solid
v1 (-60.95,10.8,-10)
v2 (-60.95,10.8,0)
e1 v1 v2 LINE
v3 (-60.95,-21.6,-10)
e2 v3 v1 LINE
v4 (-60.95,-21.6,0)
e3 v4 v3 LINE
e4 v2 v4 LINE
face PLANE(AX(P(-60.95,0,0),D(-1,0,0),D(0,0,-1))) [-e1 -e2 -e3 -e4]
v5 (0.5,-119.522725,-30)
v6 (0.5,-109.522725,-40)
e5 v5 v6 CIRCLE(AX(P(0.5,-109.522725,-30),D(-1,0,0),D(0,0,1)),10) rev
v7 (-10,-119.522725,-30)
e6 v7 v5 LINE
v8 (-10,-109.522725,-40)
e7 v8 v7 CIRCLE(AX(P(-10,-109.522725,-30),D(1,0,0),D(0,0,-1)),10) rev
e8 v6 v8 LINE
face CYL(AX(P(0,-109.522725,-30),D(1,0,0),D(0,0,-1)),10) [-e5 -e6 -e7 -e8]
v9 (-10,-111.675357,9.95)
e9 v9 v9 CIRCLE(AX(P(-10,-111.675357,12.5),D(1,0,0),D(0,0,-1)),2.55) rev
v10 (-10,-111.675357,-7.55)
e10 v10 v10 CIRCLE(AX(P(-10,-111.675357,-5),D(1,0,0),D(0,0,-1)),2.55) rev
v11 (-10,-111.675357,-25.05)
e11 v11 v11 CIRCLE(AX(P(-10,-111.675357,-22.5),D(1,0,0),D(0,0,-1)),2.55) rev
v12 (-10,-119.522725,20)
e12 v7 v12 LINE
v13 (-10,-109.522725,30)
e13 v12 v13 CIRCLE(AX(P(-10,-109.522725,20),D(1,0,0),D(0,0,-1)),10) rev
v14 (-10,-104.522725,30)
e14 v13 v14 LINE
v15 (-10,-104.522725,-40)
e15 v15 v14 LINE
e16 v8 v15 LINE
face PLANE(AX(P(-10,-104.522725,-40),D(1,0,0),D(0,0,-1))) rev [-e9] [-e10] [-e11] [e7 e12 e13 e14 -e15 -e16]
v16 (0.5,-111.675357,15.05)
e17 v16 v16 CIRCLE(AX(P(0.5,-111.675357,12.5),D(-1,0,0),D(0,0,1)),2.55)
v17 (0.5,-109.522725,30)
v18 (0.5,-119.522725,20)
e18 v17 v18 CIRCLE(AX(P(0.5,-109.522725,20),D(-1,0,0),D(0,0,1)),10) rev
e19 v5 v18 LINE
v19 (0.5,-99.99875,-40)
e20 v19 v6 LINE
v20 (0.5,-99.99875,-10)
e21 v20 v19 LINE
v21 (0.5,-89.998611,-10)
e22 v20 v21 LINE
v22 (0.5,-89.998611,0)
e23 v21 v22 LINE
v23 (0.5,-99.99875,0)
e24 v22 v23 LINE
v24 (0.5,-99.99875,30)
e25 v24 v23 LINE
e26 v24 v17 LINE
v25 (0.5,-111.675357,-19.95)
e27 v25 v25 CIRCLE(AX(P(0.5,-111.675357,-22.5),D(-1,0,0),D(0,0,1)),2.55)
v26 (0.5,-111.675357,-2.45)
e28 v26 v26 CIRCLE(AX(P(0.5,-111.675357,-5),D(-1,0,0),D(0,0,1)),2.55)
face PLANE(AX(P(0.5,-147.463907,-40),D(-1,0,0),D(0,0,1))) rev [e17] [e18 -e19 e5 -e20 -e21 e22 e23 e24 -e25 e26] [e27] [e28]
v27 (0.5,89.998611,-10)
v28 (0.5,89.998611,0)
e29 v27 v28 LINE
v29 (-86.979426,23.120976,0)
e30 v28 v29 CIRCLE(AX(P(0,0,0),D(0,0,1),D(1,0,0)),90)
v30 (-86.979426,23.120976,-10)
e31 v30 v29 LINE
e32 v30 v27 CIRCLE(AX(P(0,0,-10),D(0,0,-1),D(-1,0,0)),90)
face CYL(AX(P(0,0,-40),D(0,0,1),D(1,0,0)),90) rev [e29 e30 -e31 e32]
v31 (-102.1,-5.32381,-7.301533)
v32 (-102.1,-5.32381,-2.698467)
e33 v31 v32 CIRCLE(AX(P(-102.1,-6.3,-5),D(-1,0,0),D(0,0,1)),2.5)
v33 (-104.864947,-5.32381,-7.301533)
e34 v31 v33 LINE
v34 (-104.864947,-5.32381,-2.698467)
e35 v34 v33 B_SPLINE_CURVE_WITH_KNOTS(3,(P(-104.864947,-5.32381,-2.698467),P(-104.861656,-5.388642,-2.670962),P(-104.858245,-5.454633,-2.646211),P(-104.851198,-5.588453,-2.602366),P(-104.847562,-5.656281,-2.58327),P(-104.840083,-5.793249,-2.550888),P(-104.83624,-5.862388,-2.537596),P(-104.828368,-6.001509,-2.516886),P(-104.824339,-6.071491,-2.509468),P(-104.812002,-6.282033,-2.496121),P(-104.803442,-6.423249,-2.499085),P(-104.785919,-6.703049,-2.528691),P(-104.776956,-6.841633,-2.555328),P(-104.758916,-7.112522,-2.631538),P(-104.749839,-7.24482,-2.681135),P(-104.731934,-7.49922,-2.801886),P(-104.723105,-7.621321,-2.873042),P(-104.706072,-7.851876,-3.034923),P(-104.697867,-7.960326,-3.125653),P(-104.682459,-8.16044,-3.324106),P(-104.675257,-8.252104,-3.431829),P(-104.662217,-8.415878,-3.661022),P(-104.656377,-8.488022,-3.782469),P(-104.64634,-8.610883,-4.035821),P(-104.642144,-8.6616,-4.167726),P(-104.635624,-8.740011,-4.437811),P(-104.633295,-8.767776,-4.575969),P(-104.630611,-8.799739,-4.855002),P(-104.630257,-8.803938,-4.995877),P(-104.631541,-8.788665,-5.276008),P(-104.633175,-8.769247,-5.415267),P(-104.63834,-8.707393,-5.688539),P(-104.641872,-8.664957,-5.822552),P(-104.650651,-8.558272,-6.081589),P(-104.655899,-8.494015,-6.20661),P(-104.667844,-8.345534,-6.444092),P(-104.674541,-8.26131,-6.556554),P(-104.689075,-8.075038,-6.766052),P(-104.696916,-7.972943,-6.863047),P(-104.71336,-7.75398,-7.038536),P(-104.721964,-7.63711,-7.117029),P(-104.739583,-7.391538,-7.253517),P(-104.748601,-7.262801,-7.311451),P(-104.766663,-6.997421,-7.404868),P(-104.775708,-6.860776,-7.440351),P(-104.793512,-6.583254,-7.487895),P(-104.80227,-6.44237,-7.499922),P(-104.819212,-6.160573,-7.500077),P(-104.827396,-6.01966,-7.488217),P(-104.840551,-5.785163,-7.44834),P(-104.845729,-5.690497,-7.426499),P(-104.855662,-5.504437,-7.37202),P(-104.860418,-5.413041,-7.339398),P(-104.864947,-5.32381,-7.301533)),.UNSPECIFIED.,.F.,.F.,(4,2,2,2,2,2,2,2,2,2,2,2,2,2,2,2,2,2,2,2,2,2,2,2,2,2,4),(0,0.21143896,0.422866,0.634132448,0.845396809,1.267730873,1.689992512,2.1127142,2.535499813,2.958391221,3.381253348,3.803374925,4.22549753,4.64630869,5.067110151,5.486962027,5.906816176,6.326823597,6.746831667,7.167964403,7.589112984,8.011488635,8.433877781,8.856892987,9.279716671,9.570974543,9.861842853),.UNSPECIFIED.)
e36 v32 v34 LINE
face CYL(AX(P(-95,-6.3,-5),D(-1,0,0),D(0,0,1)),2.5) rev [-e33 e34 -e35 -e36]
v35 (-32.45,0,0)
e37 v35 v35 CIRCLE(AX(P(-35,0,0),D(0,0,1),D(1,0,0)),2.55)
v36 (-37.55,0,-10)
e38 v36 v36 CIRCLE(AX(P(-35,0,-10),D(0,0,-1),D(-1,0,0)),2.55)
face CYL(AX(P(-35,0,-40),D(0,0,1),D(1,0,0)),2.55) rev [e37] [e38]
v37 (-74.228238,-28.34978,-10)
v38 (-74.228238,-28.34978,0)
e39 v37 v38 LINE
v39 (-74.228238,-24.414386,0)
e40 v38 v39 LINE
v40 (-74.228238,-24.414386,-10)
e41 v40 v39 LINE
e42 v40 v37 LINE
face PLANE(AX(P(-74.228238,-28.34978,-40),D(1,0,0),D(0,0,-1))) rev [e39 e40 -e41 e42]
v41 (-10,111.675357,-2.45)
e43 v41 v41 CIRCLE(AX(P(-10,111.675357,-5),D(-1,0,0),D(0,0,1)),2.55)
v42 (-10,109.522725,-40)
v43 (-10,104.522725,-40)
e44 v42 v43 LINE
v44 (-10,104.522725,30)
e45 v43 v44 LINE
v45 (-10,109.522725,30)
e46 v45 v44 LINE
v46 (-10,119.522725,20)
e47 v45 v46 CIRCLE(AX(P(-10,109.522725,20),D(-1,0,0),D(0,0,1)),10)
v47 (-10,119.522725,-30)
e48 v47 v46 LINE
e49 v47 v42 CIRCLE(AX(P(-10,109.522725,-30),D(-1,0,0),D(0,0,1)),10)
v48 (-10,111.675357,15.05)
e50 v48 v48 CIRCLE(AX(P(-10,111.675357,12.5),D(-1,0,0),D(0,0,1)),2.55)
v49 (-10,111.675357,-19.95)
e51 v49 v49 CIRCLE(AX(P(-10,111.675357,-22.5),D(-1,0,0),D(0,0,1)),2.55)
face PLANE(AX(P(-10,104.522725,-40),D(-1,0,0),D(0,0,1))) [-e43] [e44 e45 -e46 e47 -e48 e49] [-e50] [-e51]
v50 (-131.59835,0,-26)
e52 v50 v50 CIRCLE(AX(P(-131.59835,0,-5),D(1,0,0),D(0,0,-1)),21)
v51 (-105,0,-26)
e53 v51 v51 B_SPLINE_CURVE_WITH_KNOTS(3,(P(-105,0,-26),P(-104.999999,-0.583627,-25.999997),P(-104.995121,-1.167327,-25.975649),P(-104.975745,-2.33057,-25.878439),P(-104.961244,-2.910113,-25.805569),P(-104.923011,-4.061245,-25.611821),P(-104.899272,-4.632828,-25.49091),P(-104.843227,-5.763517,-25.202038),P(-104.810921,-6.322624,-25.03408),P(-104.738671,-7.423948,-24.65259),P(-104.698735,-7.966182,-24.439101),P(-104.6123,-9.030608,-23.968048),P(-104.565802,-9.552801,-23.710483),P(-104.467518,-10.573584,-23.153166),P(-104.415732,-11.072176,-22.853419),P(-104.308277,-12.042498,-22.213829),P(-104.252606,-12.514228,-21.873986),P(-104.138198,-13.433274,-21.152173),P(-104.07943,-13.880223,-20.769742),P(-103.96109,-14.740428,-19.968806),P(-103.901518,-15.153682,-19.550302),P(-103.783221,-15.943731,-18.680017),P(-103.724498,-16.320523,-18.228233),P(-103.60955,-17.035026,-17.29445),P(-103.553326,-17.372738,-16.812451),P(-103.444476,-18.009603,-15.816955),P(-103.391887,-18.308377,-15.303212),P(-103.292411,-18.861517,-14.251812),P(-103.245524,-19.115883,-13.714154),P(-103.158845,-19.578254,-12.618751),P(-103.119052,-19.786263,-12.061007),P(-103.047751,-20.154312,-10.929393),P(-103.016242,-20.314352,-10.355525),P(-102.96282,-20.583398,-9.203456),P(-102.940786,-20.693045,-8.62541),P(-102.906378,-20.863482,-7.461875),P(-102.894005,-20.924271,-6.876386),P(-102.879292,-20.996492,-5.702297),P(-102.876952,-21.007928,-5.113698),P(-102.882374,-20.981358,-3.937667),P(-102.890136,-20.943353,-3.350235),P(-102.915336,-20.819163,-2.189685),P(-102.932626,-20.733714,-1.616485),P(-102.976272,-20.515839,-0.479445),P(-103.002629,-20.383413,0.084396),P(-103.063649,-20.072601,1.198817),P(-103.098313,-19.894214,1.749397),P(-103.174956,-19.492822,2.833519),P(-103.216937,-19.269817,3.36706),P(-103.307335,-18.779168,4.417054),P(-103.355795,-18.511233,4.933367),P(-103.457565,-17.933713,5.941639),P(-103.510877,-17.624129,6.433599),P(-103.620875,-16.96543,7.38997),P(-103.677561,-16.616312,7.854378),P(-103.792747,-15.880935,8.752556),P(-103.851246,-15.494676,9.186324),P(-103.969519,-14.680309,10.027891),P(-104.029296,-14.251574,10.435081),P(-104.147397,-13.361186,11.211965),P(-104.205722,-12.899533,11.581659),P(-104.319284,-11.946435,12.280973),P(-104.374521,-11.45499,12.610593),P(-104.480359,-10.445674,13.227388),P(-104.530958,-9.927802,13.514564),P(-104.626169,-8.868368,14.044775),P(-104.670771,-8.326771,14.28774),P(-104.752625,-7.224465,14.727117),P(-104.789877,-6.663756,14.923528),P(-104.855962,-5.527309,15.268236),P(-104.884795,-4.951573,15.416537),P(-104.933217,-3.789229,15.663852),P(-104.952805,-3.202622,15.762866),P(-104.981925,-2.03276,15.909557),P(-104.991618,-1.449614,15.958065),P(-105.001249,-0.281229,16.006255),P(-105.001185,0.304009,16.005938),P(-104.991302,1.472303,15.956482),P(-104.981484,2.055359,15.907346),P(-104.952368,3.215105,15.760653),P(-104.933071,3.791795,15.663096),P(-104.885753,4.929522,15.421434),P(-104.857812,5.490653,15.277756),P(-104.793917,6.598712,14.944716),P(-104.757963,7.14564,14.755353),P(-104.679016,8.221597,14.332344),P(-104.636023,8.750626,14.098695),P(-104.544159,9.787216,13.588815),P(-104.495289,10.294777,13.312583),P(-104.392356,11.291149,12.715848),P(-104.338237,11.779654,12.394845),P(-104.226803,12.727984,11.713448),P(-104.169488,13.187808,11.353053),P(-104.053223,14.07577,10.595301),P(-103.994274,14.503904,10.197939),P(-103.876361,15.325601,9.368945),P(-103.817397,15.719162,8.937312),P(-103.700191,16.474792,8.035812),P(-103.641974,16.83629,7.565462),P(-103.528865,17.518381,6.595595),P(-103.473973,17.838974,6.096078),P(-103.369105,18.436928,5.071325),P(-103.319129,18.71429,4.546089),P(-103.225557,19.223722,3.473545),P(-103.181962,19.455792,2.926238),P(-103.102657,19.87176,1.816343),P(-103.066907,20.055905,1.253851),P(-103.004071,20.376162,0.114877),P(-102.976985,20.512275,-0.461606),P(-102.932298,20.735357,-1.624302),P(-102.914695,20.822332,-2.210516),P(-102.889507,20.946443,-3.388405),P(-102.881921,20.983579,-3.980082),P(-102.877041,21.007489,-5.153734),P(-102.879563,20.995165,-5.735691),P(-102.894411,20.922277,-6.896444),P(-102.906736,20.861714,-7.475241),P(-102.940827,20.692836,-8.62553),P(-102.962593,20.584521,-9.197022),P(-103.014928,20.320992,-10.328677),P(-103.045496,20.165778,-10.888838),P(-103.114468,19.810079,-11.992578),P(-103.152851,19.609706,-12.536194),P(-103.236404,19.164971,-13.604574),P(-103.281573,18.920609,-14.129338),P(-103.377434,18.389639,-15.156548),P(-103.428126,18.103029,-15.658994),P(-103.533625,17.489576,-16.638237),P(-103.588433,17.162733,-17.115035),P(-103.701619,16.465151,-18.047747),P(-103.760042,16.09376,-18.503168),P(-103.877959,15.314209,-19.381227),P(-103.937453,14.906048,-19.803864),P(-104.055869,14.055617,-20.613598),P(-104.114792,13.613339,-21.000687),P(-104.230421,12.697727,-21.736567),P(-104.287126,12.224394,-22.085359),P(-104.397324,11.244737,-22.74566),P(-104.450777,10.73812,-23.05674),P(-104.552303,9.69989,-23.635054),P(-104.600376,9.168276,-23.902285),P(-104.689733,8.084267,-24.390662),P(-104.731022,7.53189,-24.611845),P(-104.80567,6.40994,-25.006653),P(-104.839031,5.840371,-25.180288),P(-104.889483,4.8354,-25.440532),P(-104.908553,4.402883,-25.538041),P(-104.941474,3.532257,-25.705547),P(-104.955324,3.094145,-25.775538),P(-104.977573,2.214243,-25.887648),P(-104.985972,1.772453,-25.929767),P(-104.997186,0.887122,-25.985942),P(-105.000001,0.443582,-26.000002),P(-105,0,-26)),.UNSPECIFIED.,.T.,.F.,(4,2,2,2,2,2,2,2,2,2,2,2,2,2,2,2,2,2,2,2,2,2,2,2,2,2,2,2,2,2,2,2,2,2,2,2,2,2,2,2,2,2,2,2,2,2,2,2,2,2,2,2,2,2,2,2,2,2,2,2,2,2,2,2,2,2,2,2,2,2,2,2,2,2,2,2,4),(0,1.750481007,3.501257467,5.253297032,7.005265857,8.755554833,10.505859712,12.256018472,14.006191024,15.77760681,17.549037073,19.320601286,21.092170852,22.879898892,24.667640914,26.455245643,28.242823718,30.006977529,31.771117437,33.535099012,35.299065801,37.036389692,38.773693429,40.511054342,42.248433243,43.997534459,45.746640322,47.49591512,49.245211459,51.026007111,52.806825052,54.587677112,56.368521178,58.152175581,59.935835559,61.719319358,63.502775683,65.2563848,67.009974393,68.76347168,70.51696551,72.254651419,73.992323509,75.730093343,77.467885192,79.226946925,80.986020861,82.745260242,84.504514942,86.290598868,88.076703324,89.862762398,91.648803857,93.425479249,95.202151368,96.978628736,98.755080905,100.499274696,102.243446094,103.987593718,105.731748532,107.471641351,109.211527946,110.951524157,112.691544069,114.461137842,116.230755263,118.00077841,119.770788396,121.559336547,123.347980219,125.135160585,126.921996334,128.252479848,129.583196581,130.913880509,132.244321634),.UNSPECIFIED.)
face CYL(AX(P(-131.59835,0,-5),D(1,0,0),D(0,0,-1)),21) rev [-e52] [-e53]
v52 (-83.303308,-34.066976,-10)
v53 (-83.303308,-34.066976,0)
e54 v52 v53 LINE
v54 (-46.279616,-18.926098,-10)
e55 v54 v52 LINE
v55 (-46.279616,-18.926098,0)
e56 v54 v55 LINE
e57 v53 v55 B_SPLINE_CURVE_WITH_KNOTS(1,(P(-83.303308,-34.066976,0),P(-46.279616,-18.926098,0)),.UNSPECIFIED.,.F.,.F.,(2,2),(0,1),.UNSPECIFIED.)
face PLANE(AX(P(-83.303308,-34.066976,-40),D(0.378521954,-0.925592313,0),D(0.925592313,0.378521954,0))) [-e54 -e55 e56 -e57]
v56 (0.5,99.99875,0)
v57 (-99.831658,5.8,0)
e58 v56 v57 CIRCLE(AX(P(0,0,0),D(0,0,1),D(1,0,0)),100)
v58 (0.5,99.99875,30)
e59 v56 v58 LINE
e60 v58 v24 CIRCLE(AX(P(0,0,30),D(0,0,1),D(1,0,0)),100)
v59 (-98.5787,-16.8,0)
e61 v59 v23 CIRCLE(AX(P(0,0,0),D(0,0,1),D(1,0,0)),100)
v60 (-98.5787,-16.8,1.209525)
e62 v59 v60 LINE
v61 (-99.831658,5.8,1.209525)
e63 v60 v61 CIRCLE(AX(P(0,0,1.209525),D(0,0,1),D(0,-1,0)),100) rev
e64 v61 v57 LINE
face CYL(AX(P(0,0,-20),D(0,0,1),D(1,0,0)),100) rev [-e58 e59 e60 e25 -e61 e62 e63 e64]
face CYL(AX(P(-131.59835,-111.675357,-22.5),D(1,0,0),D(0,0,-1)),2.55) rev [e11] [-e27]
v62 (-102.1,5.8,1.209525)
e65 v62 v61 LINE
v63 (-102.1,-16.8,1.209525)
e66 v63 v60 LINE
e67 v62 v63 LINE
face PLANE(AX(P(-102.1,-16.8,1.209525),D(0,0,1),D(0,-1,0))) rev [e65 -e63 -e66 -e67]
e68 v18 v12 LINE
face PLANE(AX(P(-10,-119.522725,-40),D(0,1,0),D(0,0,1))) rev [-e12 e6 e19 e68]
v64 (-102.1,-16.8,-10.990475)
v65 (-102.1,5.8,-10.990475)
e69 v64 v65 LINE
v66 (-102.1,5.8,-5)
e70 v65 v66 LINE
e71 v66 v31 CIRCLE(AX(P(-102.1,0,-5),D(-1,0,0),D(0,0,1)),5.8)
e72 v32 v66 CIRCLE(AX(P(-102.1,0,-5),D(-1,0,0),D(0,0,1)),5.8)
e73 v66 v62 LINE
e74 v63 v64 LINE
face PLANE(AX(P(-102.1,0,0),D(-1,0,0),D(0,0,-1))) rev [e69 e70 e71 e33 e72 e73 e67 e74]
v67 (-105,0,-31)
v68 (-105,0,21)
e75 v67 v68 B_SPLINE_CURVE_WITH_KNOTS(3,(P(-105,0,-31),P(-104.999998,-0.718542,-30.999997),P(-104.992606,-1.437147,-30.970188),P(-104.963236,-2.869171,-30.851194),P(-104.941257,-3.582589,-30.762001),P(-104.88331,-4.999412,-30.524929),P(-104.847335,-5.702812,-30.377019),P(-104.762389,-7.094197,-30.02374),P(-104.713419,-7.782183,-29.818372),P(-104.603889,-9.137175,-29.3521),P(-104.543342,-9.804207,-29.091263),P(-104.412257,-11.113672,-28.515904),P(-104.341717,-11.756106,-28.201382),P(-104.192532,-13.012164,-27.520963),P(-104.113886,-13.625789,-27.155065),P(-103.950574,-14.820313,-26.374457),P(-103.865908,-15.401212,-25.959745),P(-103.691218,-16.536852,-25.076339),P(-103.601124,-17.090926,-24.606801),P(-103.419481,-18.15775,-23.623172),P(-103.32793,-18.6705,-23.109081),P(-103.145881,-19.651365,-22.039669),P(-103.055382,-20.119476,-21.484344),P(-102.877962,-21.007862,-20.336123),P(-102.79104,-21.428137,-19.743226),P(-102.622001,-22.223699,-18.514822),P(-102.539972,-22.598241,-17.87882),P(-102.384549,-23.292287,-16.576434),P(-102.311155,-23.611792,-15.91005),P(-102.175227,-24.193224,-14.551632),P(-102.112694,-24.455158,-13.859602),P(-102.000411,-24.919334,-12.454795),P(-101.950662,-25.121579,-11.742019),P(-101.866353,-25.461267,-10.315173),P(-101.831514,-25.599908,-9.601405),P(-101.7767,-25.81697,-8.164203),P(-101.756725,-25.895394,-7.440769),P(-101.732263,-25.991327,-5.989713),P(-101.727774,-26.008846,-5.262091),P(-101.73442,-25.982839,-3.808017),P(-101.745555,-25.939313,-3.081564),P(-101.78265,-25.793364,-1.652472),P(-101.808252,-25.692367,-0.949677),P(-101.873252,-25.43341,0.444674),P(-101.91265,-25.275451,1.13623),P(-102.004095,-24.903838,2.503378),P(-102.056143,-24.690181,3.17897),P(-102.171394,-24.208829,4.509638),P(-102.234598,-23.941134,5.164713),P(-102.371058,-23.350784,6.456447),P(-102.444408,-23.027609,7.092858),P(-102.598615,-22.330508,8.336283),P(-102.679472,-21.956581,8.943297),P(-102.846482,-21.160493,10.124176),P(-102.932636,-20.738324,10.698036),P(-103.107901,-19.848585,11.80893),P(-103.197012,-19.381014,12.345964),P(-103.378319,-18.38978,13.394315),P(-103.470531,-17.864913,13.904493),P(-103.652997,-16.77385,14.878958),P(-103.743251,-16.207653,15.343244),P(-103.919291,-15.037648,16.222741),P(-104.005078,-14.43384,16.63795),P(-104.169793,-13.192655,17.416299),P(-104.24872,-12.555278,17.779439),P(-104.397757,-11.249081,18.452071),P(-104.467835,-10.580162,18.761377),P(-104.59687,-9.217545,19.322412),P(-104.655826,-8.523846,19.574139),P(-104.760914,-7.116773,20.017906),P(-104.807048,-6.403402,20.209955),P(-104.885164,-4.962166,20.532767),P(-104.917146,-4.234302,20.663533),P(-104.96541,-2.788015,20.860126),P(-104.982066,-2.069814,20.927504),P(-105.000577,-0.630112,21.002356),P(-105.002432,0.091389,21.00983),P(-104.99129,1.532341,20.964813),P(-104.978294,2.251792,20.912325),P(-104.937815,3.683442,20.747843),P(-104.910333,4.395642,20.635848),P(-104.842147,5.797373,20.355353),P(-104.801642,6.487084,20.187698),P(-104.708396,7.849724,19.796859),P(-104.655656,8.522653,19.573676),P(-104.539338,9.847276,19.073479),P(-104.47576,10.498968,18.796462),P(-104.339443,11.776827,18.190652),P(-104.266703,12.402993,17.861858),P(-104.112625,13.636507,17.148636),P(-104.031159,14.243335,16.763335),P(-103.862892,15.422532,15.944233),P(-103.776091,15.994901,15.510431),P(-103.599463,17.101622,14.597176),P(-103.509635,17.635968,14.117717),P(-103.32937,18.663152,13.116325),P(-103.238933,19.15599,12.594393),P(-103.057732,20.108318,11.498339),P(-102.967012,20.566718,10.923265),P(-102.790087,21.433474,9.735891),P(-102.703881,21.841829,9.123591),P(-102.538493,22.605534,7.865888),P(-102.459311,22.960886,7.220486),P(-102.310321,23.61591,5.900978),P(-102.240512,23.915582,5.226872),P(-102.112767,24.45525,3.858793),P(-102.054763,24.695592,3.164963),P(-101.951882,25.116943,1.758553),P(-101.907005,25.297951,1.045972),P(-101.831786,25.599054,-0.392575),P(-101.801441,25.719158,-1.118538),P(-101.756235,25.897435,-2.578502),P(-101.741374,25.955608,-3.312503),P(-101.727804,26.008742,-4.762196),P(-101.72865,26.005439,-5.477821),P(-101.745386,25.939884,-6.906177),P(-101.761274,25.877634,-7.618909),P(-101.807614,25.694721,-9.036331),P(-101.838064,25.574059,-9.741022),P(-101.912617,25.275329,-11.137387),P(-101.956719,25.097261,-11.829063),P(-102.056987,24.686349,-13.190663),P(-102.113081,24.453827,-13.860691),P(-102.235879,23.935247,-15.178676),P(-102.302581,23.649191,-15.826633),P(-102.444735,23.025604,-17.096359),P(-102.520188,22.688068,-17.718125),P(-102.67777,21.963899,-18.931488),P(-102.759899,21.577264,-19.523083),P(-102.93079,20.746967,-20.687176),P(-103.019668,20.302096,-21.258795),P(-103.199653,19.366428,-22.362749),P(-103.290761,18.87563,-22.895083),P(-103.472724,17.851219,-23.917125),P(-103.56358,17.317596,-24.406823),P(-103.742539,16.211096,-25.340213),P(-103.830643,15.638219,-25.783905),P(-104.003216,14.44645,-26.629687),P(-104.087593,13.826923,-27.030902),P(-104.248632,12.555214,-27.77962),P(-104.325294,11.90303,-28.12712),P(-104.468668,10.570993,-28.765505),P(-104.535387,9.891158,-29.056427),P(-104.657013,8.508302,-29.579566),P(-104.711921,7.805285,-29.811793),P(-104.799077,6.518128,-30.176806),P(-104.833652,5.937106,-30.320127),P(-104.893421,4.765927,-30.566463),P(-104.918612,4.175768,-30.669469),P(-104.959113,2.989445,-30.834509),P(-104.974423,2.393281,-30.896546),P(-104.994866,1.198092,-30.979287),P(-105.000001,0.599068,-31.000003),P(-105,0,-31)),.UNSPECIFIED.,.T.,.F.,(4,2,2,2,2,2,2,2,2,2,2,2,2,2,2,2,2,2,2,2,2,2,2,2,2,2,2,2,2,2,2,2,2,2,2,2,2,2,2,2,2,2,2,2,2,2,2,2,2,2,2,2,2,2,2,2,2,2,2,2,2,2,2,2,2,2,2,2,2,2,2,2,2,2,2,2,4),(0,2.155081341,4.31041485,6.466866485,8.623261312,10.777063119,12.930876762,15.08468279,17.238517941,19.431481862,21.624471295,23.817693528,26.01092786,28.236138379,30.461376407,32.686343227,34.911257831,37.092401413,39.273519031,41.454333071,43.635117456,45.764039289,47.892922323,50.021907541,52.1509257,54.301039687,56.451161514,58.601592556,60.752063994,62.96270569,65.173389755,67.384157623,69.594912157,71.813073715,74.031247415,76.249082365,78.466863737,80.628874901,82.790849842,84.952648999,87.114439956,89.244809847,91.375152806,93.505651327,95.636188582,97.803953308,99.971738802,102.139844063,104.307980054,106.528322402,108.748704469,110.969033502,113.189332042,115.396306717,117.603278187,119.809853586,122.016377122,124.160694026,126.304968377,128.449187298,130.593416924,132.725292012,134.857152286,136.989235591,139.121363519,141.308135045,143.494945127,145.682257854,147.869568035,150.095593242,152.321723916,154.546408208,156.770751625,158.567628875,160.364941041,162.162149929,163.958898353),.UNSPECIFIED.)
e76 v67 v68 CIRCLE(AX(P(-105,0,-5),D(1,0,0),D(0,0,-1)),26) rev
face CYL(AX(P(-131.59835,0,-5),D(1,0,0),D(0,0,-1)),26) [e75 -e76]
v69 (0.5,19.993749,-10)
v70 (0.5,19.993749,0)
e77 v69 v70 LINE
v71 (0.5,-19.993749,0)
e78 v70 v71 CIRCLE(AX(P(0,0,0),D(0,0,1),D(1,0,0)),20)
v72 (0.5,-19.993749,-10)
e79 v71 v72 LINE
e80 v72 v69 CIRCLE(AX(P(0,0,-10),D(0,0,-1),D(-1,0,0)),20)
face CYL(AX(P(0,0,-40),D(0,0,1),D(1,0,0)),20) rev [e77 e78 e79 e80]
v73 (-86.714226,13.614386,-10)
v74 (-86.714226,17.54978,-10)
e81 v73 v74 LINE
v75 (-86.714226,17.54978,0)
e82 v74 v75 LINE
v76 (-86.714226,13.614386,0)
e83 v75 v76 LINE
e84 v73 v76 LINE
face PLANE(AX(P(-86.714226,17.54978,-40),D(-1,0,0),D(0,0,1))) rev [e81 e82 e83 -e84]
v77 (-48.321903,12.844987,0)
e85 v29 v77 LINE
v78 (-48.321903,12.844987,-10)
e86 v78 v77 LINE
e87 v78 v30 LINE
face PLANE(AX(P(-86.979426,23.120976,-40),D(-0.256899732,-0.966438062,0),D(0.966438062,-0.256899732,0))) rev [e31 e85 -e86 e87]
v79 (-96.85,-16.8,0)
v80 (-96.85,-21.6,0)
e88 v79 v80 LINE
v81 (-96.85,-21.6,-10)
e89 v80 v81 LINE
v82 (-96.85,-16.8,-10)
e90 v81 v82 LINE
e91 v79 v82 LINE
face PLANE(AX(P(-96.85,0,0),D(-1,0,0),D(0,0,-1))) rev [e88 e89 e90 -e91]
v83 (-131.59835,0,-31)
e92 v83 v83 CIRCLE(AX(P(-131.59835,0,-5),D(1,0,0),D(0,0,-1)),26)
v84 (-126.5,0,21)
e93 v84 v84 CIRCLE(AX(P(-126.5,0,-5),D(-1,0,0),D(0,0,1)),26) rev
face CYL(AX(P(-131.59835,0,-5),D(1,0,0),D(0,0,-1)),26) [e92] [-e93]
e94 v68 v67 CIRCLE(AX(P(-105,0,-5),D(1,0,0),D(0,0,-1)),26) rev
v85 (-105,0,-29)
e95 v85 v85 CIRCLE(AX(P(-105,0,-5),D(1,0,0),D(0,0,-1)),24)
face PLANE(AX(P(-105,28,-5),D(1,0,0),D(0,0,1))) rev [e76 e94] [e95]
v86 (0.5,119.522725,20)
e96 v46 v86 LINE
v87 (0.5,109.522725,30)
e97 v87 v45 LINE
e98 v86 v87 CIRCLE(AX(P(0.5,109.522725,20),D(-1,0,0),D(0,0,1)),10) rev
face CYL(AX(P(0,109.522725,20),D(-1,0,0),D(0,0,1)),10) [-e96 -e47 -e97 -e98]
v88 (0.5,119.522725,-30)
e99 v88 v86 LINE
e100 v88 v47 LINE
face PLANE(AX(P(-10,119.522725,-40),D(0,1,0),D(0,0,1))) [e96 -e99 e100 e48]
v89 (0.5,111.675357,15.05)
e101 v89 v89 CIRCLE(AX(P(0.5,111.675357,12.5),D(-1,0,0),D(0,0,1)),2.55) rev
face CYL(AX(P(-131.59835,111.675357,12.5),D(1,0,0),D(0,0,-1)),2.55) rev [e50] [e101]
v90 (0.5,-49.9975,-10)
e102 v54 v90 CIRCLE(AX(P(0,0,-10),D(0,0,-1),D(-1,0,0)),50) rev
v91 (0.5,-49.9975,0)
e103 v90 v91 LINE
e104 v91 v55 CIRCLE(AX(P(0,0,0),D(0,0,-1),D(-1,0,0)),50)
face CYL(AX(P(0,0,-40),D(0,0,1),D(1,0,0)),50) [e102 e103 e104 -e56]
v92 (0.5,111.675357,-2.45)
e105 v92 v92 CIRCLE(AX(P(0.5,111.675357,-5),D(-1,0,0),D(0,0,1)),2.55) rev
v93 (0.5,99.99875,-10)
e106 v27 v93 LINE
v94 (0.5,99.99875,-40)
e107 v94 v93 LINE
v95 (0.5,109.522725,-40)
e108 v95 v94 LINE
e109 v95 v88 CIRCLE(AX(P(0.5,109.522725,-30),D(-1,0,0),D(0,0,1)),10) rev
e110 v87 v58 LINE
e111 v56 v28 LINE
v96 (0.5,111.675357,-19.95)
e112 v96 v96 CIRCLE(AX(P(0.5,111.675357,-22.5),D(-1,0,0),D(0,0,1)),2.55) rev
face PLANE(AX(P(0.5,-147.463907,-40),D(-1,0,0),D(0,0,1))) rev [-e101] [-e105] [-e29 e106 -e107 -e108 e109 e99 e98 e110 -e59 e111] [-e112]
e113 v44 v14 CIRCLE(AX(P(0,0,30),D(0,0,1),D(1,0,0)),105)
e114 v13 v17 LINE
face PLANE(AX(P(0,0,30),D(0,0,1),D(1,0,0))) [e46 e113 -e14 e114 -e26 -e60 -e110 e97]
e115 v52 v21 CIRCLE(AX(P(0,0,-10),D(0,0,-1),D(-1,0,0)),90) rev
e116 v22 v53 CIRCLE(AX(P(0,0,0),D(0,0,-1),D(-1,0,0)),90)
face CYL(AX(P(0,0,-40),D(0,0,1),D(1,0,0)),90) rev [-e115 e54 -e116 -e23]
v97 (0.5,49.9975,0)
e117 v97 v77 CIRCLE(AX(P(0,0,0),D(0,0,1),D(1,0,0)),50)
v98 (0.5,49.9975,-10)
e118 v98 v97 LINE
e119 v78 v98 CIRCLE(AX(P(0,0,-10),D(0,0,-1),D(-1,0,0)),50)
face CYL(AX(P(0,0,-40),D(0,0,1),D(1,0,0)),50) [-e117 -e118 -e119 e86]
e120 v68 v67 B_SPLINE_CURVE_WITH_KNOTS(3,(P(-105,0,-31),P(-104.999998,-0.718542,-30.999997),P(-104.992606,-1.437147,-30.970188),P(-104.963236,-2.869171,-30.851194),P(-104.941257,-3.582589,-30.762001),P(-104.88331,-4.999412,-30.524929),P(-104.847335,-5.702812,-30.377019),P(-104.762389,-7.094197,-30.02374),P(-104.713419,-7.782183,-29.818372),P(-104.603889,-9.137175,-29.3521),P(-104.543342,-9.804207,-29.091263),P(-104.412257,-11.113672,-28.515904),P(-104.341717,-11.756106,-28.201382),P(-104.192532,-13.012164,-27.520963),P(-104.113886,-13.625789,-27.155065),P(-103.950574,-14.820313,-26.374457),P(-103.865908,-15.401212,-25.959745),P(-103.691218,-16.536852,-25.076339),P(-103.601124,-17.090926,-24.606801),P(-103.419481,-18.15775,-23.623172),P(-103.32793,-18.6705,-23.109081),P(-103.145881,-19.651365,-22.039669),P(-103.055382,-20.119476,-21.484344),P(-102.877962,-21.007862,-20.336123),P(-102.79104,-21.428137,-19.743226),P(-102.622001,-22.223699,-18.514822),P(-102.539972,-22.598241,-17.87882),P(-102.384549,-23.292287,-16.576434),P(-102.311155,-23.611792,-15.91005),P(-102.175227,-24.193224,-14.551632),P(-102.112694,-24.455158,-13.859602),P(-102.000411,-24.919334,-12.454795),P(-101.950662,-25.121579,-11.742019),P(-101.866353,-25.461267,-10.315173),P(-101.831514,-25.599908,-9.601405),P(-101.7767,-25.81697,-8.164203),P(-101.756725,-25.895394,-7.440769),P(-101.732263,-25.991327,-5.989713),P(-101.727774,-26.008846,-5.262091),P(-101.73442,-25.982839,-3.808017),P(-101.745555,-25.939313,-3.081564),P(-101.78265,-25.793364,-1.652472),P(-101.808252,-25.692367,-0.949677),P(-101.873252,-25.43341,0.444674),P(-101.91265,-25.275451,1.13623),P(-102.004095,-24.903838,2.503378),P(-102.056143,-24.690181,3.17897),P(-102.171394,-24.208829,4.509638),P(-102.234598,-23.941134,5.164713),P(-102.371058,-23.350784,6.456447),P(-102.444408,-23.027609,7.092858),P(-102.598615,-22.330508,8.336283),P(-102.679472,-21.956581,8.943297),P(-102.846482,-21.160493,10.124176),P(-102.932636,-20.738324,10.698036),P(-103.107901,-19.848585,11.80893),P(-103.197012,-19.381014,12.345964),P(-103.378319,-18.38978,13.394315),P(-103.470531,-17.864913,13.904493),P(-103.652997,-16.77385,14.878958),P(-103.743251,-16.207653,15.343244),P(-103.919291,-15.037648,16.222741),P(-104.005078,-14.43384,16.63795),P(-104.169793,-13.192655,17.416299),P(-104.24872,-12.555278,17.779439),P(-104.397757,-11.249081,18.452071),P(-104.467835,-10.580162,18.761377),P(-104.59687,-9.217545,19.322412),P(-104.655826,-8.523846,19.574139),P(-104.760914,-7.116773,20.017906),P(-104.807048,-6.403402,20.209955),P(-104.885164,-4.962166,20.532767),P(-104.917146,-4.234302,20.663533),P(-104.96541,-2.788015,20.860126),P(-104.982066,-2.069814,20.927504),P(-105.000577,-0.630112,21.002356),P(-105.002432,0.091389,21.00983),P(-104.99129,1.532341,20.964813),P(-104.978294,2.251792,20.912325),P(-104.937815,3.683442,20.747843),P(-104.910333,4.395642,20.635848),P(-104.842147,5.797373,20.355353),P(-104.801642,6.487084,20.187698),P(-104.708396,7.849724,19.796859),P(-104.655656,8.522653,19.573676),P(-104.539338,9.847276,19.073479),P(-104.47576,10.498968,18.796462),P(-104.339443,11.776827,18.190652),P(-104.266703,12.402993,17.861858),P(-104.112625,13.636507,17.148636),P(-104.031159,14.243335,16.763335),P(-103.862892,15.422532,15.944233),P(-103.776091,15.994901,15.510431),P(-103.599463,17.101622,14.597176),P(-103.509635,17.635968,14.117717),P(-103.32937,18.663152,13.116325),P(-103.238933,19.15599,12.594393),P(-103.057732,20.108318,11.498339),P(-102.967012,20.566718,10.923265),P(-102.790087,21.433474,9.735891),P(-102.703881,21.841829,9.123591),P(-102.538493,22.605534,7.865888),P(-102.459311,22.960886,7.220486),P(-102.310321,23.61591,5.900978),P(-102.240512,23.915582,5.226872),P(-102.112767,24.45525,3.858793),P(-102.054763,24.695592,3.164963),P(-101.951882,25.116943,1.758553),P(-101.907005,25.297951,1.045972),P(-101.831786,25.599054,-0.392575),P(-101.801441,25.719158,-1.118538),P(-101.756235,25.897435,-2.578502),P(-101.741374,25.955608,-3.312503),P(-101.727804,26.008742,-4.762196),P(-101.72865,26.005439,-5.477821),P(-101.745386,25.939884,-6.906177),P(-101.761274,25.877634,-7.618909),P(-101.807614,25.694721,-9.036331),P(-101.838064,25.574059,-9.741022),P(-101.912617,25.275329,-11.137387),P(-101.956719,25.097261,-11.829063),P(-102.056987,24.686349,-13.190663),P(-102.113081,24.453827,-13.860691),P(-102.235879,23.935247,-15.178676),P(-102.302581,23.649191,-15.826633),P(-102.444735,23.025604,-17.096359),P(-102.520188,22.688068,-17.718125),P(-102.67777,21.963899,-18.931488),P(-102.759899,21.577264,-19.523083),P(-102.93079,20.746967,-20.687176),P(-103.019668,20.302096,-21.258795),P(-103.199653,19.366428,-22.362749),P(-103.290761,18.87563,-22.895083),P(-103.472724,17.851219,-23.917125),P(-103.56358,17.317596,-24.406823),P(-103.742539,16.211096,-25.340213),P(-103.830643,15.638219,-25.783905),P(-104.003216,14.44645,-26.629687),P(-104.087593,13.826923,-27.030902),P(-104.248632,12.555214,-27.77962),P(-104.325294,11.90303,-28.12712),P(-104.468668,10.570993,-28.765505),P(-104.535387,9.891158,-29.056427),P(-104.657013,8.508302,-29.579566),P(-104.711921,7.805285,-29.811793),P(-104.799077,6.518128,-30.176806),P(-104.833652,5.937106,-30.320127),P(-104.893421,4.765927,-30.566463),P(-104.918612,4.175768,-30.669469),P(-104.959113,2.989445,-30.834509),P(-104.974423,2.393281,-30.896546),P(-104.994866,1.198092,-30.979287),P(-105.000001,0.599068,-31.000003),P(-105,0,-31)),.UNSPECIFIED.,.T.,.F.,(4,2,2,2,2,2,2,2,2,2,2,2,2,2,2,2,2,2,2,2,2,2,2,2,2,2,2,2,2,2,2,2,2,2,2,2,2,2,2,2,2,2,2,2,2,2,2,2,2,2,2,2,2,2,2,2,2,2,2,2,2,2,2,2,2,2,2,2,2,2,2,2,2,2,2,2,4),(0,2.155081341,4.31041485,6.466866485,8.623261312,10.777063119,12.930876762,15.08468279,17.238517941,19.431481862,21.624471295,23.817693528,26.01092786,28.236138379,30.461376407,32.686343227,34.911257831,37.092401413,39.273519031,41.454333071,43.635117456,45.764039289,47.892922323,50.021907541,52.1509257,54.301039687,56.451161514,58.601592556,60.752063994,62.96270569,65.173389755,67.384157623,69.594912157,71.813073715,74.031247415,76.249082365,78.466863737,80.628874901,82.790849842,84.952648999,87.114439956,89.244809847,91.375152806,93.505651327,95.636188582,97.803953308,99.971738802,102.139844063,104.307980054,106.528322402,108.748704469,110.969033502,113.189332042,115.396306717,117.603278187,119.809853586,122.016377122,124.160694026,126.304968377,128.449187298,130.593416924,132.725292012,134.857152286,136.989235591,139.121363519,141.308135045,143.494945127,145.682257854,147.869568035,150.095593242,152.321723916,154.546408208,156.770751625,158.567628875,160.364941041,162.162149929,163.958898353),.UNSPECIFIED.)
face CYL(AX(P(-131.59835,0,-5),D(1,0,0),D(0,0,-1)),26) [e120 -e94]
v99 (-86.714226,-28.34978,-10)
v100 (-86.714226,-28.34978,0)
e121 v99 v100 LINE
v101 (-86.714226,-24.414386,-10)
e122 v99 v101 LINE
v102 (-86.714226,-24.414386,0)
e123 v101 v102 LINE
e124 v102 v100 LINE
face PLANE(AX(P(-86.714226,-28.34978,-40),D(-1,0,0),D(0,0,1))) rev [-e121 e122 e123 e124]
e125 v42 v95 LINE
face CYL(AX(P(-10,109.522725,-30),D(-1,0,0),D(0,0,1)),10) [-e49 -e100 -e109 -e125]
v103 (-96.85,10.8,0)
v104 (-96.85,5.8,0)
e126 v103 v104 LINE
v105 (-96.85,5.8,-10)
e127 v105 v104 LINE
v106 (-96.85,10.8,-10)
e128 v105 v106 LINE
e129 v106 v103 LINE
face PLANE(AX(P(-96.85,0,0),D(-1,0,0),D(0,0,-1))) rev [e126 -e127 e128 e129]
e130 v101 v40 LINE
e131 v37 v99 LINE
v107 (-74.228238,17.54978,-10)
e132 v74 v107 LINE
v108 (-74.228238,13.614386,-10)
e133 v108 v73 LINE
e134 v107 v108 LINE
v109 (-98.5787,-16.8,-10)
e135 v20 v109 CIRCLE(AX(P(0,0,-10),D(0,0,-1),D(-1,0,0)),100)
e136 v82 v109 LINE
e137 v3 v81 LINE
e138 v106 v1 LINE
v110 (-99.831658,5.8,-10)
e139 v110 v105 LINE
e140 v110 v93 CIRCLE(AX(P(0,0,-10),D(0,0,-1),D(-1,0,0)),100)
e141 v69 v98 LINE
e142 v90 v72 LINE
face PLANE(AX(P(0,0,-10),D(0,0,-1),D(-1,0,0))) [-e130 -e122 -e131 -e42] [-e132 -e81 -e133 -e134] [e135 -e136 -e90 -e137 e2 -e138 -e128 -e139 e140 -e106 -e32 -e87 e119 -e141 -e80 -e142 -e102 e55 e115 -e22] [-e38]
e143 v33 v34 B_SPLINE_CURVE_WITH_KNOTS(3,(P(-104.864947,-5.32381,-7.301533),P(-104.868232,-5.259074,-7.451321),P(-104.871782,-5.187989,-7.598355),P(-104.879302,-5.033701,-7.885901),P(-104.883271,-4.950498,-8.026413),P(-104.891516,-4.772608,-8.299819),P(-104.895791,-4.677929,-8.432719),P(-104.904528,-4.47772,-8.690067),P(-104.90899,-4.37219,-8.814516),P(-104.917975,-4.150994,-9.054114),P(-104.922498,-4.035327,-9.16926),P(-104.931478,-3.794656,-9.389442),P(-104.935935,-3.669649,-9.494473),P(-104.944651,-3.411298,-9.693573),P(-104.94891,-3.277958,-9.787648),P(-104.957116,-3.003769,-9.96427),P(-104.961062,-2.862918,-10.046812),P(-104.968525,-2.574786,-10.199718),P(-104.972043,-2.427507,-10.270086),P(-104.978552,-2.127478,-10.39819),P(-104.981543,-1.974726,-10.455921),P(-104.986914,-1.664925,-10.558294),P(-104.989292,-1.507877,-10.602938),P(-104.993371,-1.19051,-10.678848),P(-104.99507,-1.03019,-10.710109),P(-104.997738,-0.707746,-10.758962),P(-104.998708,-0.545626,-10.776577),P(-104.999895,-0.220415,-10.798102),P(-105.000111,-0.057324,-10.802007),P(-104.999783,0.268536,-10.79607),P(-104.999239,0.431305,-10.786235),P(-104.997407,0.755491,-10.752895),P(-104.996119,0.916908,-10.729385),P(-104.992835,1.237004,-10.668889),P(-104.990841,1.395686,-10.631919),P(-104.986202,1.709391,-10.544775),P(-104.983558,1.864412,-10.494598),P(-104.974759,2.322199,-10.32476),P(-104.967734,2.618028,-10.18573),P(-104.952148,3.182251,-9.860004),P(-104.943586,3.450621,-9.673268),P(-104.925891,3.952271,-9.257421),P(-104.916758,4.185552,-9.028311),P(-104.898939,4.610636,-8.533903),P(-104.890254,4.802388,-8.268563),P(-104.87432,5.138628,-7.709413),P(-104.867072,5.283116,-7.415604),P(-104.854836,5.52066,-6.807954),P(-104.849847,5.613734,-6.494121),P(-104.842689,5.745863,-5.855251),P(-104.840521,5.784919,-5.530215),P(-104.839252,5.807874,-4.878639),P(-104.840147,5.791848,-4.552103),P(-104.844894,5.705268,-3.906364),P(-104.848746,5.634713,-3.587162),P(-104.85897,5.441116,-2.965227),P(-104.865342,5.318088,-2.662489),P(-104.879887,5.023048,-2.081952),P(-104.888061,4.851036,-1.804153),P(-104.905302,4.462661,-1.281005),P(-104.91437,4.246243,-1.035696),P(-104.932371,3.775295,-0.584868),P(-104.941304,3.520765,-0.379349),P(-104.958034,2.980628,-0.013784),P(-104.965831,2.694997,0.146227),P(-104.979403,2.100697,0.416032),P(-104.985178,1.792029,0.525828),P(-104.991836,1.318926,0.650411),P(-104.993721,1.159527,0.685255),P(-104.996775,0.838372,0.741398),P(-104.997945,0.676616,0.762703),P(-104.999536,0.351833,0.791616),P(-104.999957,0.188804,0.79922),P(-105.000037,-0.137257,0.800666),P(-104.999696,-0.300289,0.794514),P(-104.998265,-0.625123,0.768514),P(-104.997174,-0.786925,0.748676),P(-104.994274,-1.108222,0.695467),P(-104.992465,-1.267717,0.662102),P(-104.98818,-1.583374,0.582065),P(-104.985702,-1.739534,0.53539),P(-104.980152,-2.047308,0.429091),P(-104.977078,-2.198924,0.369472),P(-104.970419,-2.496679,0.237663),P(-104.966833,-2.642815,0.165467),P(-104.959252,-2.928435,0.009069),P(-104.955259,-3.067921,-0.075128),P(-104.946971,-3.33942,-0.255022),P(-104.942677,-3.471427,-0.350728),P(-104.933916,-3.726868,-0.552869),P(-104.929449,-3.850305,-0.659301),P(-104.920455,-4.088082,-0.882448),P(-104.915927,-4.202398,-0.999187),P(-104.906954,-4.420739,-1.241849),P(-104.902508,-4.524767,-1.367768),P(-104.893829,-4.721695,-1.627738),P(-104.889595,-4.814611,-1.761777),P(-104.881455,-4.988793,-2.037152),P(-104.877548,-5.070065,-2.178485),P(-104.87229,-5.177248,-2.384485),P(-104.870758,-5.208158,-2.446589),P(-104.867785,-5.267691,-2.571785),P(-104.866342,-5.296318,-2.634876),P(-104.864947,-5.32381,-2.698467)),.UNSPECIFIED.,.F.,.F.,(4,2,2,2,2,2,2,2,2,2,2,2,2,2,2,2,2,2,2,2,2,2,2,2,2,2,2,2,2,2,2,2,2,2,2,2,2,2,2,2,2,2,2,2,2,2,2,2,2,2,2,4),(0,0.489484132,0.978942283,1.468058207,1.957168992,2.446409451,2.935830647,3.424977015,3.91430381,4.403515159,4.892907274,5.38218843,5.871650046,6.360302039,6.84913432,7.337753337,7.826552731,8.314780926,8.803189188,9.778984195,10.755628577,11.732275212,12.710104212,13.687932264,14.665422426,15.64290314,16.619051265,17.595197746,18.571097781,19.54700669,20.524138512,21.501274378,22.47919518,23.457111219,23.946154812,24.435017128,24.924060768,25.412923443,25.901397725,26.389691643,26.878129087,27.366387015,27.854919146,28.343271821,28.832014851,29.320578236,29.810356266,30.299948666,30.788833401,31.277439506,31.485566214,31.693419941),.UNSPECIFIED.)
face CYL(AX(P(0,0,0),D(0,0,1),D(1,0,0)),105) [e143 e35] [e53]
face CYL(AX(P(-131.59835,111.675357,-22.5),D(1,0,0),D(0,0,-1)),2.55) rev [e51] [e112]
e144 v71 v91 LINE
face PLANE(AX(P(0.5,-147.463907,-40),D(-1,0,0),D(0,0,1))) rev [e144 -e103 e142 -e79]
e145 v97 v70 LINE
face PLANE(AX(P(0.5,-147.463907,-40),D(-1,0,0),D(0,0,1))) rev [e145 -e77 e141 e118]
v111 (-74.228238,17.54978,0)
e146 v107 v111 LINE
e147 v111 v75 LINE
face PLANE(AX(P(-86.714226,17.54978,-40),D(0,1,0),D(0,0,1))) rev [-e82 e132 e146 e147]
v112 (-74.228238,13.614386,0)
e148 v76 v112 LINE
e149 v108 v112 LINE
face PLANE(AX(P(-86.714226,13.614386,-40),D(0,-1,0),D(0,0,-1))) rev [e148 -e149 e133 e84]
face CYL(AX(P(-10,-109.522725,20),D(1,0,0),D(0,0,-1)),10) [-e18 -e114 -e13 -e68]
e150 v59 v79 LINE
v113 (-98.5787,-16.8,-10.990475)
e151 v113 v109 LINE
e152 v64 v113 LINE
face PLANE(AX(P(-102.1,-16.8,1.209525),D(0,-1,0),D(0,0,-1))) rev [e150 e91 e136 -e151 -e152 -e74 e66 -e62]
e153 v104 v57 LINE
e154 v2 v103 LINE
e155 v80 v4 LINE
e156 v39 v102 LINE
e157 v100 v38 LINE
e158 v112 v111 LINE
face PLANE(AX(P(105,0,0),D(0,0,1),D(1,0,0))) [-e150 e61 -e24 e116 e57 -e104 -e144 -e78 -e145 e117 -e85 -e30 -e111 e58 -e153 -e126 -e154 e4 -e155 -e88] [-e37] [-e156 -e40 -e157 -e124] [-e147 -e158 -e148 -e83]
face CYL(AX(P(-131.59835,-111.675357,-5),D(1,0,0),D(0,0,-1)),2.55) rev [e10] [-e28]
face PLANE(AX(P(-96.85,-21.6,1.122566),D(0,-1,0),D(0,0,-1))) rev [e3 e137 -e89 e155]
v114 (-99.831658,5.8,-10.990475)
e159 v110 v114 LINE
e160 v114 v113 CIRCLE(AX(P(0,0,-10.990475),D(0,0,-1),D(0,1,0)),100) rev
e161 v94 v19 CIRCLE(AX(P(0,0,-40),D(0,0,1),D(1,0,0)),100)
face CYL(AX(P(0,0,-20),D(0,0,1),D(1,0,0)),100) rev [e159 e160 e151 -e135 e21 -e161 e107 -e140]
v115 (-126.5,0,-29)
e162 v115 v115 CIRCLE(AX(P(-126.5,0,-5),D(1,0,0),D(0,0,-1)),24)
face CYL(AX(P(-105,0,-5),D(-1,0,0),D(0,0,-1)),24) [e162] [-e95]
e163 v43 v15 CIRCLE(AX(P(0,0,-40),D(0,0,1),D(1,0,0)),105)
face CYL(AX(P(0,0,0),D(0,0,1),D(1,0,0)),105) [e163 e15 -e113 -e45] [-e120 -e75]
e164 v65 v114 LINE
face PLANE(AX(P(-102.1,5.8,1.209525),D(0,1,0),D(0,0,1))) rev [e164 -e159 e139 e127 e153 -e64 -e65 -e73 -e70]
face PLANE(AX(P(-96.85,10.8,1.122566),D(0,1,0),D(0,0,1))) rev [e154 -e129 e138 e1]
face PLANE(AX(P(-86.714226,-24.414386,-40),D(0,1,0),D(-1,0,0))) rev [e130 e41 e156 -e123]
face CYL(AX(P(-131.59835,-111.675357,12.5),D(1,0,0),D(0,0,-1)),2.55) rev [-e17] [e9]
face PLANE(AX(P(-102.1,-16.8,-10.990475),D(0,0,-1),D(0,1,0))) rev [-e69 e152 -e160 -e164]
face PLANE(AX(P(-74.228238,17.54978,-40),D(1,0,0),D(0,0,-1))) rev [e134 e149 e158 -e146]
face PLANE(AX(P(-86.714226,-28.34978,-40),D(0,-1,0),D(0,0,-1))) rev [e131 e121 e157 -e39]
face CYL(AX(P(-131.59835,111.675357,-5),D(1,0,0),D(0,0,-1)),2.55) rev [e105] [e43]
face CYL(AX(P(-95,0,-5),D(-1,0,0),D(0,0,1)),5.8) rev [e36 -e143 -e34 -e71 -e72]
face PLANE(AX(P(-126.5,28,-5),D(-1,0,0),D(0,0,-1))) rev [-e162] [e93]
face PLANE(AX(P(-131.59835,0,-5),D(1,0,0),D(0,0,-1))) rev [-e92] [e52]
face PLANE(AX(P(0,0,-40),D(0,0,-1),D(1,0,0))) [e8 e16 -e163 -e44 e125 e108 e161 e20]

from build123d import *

# Parameters (mm, degrees)
SKETCH_1_W                = 105
SKETCH_1_H                = 10
EXTRUDE_3_DEPTH           = 10
EXTRUDE_3_DEPTH_BACK      = 20
SKETCH_11_R               = 105
SKETCH_11_R_2             = 100
EXTRUDE_START             = 20
SKETCH_12_R               = 105
SKETCH_12_R_2             = 100
EXTRUDE_4_DEPTH           = 20
SKETCH_4_R                = 25.5
SKETCH_4_R_2              = 20.5
EXTRUDE_6_DEPTH           = 20
EXTRUDE_START_2           = -31.598350223
EXTRUDE_7_OUTLINE_R       = 26
EXTRUDE_7_OUTLINE_R_2     = 21
EXTRUDE_7_DEPTH           = 30.598350223
SKETCH_6_R                = 20
CUT_EXTRUDE_1_DEPTH       = 174.040821302
CUT_EXTRUDE_8_DEPTH       = 10
CUT_EXTRUDE_START         = -4.05
SKETCH_17_W               = 12.2
SKETCH_17_H               = 22.6
CUT_EXTRUDE_9_DEPTH       = 6.15
CUT_EXTRUDE_START_2       = -35
CUT_EXTRUDE_10_DEPTH      = 35.9
SKETCH_21_W               = 12.48598734
SKETCH_21_H               = 3.935393954
CUT_EXTRUDE_11_DEPTH      = 174.040821302
SKETCH_23_W               = 21.5
SKETCH_23_H               = 4
MIRROR_START              = -126.5
MIRROR_3_OUTLINE_R        = 26
MIRROR_3_OUTLINE_R_2      = 24
MIRROR_3_DEPTH            = 21.5
SKETCH_24_R               = 20
CUT_EXTRUDE_12_DEPTH      = 174.040821302
SKETCH_25_W               = 5.25
SKETCH_25_H               = 10
CUT_EXTRUDE_13_DEPTH      = 1
EXTRUDE_8_DEPTH           = 35
FILLET_1_R                = 10
FILLET_1_OF_MIRROR_4_R    = 10
M5X0_8_1_D                = 4.2
SKETCH_38_R               = 2.55
CUT_EXTRUDE_17_DEPTH      = 190.567335177
M5X0_8_2_D                = 4.2
CUT_EXTRUDE_18_DEPTH      = 183.219119633
CUT_EXTRUDE_18_DEPTH_BACK = 183.219119633
SKETCH_39_R               = 2.55
CUT_EXTRUDE_14_DEPTH      = 183.219119633
CUT_EXTRUDE_14_DEPTH_BACK = 183.219119633
SKETCH_34_W               = 208.658629851
SKETCH_34_H               = 276.195432186


with BuildPart() as part:
    # 草图1 → 旋转1 (revolve)
    with BuildSketch(Plane(origin=(0, 0, 0), x_dir=(1, 0, 0), z_dir=(0, 1, 0))):
        with Locations((52.5, 5)):
            Rectangle(SKETCH_1_W, SKETCH_1_H)
    revolve(axis=Axis((0, 0, 0), (0, 0, -1)))

    # 草图11 → 凸台-拉伸3 (add, two sides: drawn at the far end of the back side and taken through both)
    with BuildSketch(Plane.XY.offset(-EXTRUDE_3_DEPTH_BACK)):
        Circle(SKETCH_11_R)
        Circle(SKETCH_11_R_2, mode=Mode.SUBTRACT)
    extrude(amount=EXTRUDE_3_DEPTH + EXTRUDE_3_DEPTH_BACK)

    # 草图12 → 凸台-拉伸4 (add)
    with BuildSketch(Plane.XY.offset(10).offset(EXTRUDE_START)):
        Circle(SKETCH_12_R)
        Circle(SKETCH_12_R_2, mode=Mode.SUBTRACT)
    extrude_4 = extrude(amount=-EXTRUDE_4_DEPTH)

    # 镜向1: 凸台-拉伸4 across plane
    add(extrude_4.mirror(Plane.XY.offset(-5)))

    # 草图4 → 凸台-拉伸6 (add)
    with BuildSketch(Plane(origin=(100, 0, 0), x_dir=(0, 0, -1), z_dir=(1, 0, 0))):
        with Locations((5, 0)):
            Circle(SKETCH_4_R)
        with Locations((5, 0)):
            Circle(SKETCH_4_R_2, mode=Mode.SUBTRACT)
    extrude(amount=EXTRUDE_6_DEPTH)

    # 凸台-拉伸7: read off the stored shape, not the designer's step
    # 凸台-拉伸7 outline → 凸台-拉伸7 (add)
    with BuildSketch(Plane(origin=(-100, 0, 0), x_dir=(0, 0, -1), z_dir=(1, 0, 0)).offset(EXTRUDE_START_2)):
        with Locations((5, 0)):
            Circle(EXTRUDE_7_OUTLINE_R)
        with Locations((5, 0)):
            Circle(EXTRUDE_7_OUTLINE_R_2, mode=Mode.SUBTRACT)
    extrude(amount=EXTRUDE_7_DEPTH)

    # 草图6 → 切除-拉伸1 (cut, through all)
    with BuildSketch(Plane.XY):
        with Locations((0, -70)):
            Circle(SKETCH_6_R)
        with Locations(Location((0, 70, 0), (0, 0, 180))):
            Circle(SKETCH_6_R)
    extrude(amount=-CUT_EXTRUDE_1_DEPTH, mode=Mode.SUBTRACT)

    # 草图16 → 切除-拉伸8 (cut)
    with BuildSketch(Plane(origin=(105, 0, 0), x_dir=(0, 0, -1), z_dir=(1, 0, 0))):
        with BuildLine():
            ThreePointArc((7.301532566, -5.323809524), (5, 5.8), (2.698467434, -5.323809524))
            ThreePointArc((2.698467434, -5.323809524), (5, -8.8), (7.301532566, -5.323809524))
        make_face()
    cut_extrude_8 = extrude(amount=-CUT_EXTRUDE_8_DEPTH, mode=Mode.SUBTRACT)

    # 草图17 → 切除-拉伸9 (cut)
    with BuildSketch(Plane(origin=(100, 0, 0), x_dir=(0, 0, -1), z_dir=(1, 0, 0)).offset(CUT_EXTRUDE_START)):
        with Locations((4.890474786, -5.5)):
            Rectangle(SKETCH_17_W, SKETCH_17_H)
    cut_extrude_9 = extrude(amount=CUT_EXTRUDE_9_DEPTH, mode=Mode.SUBTRACT)

    # 草图19 → 切除-拉伸10 (cut)
    with BuildSketch(Plane(origin=(95.95, 0, 0), x_dir=(0, 0, -1), z_dir=(1, 0, 0)).offset(CUT_EXTRUDE_START_2)):
        Polygon((-1.122566441, -16.8), (-1.122566441, 5.8), (-1.122566441, 10.8), (11.077433559, 10.8), (11.077433559, 5.8), (11.077433559, -16.8), (11.077433559, -21.6), (-1.122566441, -21.6), align=None)
    cut_extrude_10 = extrude(amount=CUT_EXTRUDE_10_DEPTH, mode=Mode.SUBTRACT)

    # 镜向2: 切除-拉伸8, 切除-拉伸9, 切除-拉伸10 across plane
    add(cut_extrude_8.mirror(Plane(origin=(0, 0, 0), x_dir=(0, 0, 1), z_dir=(1, 0, 0))), mode=Mode.SUBTRACT)
    add(cut_extrude_9.mirror(Plane(origin=(0, 0, 0), x_dir=(0, 0, 1), z_dir=(1, 0, 0))), mode=Mode.SUBTRACT)
    add(cut_extrude_10.mirror(Plane(origin=(0, 0, 0), x_dir=(0, 0, 1), z_dir=(1, 0, 0))), mode=Mode.SUBTRACT)

    # 草图21 → 切除-拉伸11 (cut, through all)
    with BuildSketch(Plane.XY):
        with Locations((-80.471231892, 15.58208287)):
            Rectangle(SKETCH_21_W, SKETCH_21_H)
        with Locations((-80.471231892, -26.38208287)):
            Rectangle(SKETCH_21_W, SKETCH_21_H)
        with Locations((80.471231892, -26.38208287)):
            Rectangle(SKETCH_21_W, SKETCH_21_H)
        with Locations((80.471231892, 15.58208287)):
            Rectangle(SKETCH_21_W, SKETCH_21_H)
    extrude(amount=-CUT_EXTRUDE_11_DEPTH, mode=Mode.SUBTRACT)

    # 草图23 → 切除-旋转1 (revolve, cut)
    with BuildSketch(Plane.XY.offset(-5), mode=Mode.PRIVATE) as cut_revolve_1_sk:
        with Locations((115.75, 26)):
            Rectangle(SKETCH_23_W, SKETCH_23_H)
    revolve(cut_revolve_1_sk.sketch.rotate(Axis((120, 0, -5), (-1, 0, 0)), 90), axis=Axis((120, 0, -5), (-1, 0, 0)), mode=Mode.SUBTRACT)

    # 镜向3: read off the stored shape, not the designer's step
    # 镜向3 outline → 镜向3 (cut)
    with BuildSketch(Plane.YZ.offset(MIRROR_START)):
        with Locations((0, -5)):
            Circle(MIRROR_3_OUTLINE_R)
        with Locations((0, -5)):
            Circle(MIRROR_3_OUTLINE_R_2, mode=Mode.SUBTRACT)
    extrude(amount=MIRROR_3_DEPTH, mode=Mode.SUBTRACT)

    # 草图24 → 切除-拉伸12 (cut, through all)
    with BuildSketch(Plane.XY):
        Circle(SKETCH_24_R)
        with BuildLine():
            Line((-86.979425588, 23.120975852), (-48.321903105, 12.844986584))
            ThreePointArc((-48.321903105, 12.844986584), (0, 50), (48.321903105, 12.844986584))
            Line((48.321903105, 12.844986584), (86.979425588, 23.120975852))
            ThreePointArc((86.979425588, 23.120975852), (0, 90), (-86.979425588, 23.120975852))
        make_face()
        with BuildLine():
            Line((46.279615655, -18.926097718), (83.303308179, -34.066975893))
            ThreePointArc((83.303308179, -34.066975893), (0, -90), (-83.303308179, -34.066975893))
            Line((-83.303308179, -34.066975893), (-46.279615655, -18.926097718))
            ThreePointArc((-46.279615655, -18.926097718), (0, -50), (46.279615655, -18.926097718))
        make_face()
    extrude(amount=-CUT_EXTRUDE_12_DEPTH, mode=Mode.SUBTRACT)

    # 草图25 → 切除-拉伸13 (cut)
    with BuildSketch(Plane.XZ.offset(-5.8)):
        with Locations((99.475, -5)):
            Rectangle(SKETCH_25_W, SKETCH_25_H)
    extrude(amount=-CUT_EXTRUDE_13_DEPTH, mode=Mode.SUBTRACT)

    # 草图26 → 凸台-拉伸8 (add, symmetric)
    with BuildSketch(Plane.XY.offset(-5)):
        with BuildLine():
            Line((-10, 104.522724802), (-10, 119.522724802))
            Line((-10, 119.522724802), (10, 119.522724802))
            Line((10, 119.522724802), (10, 104.522724802))
            ThreePointArc((10, 104.522724802), (0, 105), (-10, 104.522724802))
        make_face()
    extrude_8 = extrude(amount=EXTRUDE_8_DEPTH, both=True)

    # 圆角1
    fillet_1_edges = [part.edges().sort_by_distance(p)[0] for p in [
        (0, 119.522724802, -40),
        (0, 119.522724802, 30),
    ]]
    fillet(fillet_1_edges, radius=FILLET_1_R)

    # 镜向4: 凸台-拉伸8 across plane
    add(extrude_8.mirror(Plane.ZX))

    # 圆角1 of 镜向4
    fillet_1_of_mirror_4_edges = [part.edges().sort_by_distance(p)[0] for p in [
        (0, -119.522724802, -40),
        (0, -119.522724802, 30),
    ]]
    fillet(fillet_1_of_mirror_4_edges, radius=FILLET_1_OF_MIRROR_4_R)

    # M5x0.8 螺纹孔1 (through all)
    with Locations(Plane(origin=(10, 0, 0), x_dir=(0, 0, -1), z_dir=(1, 0, 0))):
        with Locations((-12.5, 111.675356556), (5, 111.675356556), (22.5, 111.675356556)):
            m5x0_8_1 = Hole(M5X0_8_1_D / 2)

    # 草图38 → 切除-拉伸17 (cut, through all)
    with BuildSketch(Plane(origin=(10, 0, 0), x_dir=(0, 0, -1), z_dir=(1, 0, 0))):
        with Locations((-12.5, 111.675356556)):
            Circle(SKETCH_38_R)
        with Locations((5, 111.675356556)):
            Circle(SKETCH_38_R)
        with Locations((22.5, 111.675356556)):
            Circle(SKETCH_38_R)
    cut_extrude_17 = extrude(amount=-CUT_EXTRUDE_17_DEPTH, mode=Mode.SUBTRACT)

    # 镜向5: M5x0.8 螺纹孔1, 切除-拉伸17 across plane
    add(m5x0_8_1.mirror(Plane.ZX), mode=Mode.SUBTRACT)
    add(cut_extrude_17.mirror(Plane.ZX), mode=Mode.SUBTRACT)

    # M5x0.8 螺纹孔2 (through all)
    with Locations(Plane.XY):
        with Locations((-35, 0), (35, 0)):
            Hole(M5X0_8_2_D / 2)

    # 草图39 → 切除-拉伸18 (cut, two sides: drawn at the far end of the back side and taken through both)
    with BuildSketch(Plane.XY.offset(-CUT_EXTRUDE_18_DEPTH_BACK)):
        with Locations((-35, 0)):
            Circle(SKETCH_39_R)
        with Locations((35, 0)):
            Circle(SKETCH_39_R)
    extrude(amount=CUT_EXTRUDE_18_DEPTH + CUT_EXTRUDE_18_DEPTH_BACK, mode=Mode.SUBTRACT)

    # 草图34 → 切除-拉伸14 (cut, two sides: drawn at the far end of the back side and taken through both)
    with BuildSketch(Plane.XY.offset(-CUT_EXTRUDE_14_DEPTH_BACK)):
        with Locations((104.829314926, -9.366190691)):
            Rectangle(SKETCH_34_W, SKETCH_34_H)
    extrude(amount=CUT_EXTRUDE_14_DEPTH + CUT_EXTRUDE_14_DEPTH_BACK, mode=Mode.SUBTRACT)


solid = part.part
